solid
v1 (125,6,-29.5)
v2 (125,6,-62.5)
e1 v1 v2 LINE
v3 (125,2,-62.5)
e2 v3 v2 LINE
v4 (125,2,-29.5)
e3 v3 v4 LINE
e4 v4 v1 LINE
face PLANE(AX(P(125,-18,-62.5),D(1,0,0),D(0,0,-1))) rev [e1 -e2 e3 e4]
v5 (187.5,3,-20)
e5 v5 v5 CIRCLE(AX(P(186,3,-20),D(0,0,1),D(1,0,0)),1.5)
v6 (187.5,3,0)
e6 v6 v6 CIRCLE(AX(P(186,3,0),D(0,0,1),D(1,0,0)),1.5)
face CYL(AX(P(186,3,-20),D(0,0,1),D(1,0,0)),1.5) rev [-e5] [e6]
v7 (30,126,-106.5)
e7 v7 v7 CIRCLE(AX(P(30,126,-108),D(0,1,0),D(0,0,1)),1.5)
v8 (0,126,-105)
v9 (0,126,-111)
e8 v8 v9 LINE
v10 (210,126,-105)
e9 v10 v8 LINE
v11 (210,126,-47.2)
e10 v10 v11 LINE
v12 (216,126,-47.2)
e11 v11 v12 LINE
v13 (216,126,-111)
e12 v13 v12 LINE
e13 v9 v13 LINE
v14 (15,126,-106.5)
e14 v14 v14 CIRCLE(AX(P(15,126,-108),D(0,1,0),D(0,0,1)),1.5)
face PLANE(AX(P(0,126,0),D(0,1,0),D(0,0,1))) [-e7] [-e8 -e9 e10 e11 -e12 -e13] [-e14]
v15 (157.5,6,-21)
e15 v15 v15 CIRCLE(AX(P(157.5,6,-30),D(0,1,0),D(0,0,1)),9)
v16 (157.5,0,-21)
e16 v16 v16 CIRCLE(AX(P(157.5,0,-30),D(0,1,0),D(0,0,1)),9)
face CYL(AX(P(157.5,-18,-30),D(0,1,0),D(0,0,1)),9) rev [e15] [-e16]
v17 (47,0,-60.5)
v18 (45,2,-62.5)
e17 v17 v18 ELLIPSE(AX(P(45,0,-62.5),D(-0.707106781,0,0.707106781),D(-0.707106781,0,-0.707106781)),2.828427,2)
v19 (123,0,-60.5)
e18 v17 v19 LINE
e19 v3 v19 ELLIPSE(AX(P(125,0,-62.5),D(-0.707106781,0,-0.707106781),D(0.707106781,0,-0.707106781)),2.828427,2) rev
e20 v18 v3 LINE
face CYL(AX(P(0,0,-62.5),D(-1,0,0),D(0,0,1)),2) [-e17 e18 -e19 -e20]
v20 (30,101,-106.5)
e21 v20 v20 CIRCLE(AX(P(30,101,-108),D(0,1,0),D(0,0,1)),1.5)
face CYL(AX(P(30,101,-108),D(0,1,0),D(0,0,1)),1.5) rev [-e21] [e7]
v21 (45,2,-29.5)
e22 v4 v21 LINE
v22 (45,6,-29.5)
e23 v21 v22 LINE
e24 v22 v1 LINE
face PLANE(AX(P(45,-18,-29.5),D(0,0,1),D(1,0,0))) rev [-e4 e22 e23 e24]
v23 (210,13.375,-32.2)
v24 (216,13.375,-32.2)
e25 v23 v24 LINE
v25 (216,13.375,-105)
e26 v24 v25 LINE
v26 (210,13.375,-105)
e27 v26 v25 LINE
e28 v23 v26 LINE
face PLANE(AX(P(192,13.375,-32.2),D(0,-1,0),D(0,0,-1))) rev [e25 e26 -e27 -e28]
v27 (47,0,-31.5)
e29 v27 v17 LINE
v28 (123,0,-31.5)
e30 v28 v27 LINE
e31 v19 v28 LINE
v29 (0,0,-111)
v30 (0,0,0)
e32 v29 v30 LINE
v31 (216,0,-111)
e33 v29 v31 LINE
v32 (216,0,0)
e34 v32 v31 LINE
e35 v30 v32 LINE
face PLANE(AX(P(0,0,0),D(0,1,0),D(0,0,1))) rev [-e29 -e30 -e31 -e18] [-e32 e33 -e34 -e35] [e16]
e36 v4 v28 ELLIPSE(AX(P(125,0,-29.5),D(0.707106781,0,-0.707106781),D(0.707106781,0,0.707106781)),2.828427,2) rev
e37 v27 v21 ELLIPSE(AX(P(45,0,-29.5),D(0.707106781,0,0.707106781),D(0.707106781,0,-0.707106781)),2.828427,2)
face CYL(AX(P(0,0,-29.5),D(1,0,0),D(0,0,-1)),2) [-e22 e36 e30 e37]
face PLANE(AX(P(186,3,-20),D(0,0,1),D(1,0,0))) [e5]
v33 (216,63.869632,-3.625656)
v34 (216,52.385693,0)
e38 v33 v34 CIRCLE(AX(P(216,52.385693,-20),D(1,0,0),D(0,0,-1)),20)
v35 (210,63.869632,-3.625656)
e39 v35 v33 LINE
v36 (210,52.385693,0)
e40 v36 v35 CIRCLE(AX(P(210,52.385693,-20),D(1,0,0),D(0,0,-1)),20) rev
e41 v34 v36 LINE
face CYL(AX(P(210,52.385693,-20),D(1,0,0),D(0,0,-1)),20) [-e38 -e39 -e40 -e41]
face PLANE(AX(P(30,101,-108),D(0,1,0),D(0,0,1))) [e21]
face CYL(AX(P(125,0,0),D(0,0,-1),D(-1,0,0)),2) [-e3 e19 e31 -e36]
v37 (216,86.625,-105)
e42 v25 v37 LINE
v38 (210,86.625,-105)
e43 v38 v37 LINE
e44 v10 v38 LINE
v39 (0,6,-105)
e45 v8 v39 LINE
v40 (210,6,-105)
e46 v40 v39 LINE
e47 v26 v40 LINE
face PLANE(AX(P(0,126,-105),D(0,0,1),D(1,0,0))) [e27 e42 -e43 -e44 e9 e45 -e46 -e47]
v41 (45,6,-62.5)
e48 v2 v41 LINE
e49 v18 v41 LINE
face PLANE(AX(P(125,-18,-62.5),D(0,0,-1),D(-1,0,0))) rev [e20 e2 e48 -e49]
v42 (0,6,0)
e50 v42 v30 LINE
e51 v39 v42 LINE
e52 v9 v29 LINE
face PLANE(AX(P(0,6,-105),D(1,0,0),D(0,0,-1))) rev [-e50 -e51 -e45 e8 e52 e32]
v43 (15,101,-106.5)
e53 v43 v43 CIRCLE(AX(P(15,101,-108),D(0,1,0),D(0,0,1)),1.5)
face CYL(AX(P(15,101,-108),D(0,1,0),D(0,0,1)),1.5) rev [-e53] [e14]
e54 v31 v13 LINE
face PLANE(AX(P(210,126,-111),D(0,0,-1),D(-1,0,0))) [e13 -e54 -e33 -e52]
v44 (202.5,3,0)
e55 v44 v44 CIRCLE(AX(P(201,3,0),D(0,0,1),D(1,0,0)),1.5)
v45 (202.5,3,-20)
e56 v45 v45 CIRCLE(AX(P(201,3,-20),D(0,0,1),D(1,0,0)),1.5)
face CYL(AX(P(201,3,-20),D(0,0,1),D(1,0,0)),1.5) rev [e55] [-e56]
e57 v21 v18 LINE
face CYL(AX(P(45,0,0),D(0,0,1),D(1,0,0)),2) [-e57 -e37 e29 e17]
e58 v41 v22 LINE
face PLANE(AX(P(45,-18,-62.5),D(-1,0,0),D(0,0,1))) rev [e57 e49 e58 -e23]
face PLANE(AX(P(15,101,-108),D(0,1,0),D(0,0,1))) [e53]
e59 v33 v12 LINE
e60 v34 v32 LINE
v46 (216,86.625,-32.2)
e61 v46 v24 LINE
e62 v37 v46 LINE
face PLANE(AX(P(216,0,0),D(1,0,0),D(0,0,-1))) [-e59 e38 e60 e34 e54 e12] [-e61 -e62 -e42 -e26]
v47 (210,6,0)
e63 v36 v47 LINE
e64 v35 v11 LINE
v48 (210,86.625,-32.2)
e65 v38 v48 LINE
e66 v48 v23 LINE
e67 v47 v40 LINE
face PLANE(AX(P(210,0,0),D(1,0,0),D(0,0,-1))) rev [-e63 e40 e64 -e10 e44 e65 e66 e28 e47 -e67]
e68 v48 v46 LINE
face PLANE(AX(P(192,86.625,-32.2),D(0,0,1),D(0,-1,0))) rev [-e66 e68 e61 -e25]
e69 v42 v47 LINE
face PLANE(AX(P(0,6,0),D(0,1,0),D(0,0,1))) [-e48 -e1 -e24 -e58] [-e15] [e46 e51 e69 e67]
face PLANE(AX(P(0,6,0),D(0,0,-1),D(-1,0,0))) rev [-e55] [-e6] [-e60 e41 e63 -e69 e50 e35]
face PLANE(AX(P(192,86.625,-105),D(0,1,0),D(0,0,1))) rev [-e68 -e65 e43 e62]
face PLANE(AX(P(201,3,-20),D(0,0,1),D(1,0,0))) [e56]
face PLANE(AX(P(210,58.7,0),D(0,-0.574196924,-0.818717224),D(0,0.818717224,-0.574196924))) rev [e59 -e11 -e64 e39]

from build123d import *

# Parameters (mm, degrees)
SKETCH1_W           = 210
SKETCH1_H           = 105
BOSS_EXTRUDE1_DEPTH = 6
SKETCH2_W           = 210
SKETCH2_H           = 6
BOSS_EXTRUDE2_DEPTH = 126
SKETCH3_W           = 111
SKETCH3_H           = 126
BOSS_EXTRUDE3_DEPTH = 6
CUT_EXTRUDE2_DEPTH  = 6
SKETCH7_R           = 9
CUT_EXTRUDE3_DEPTH  = 24
SKETCH8_W           = 72.8
SKETCH8_H           = 73.25
CUT_EXTRUDE4_DEPTH  = 24
SKETCH9_W           = 80
SKETCH9_H           = 33
CUT_EXTRUDE5_DEPTH  = 24
FILLET1_R           = 20
SKETCH11_W          = 80
SKETCH11_H          = 33
SKETCH11_W_2        = 76
SKETCH11_H_2        = 29
BOSS_EXTRUDE4_DEPTH = 2
FILLET2_R           = 2
SKETCH12_R          = 1.5
CUT_EXTRUDE6_DEPTH  = 20
SKETCH13_R          = 1.5
CUT_EXTRUDE7_DEPTH  = 25


with BuildPart() as part:
    # Sketch1 → Boss-Extrude1 (new body)
    with BuildSketch(Plane(origin=(0, 0, 0), x_dir=(1, 0, 0), z_dir=(0, 1, 0))):
        with Locations((105, 52.5)):
            Rectangle(SKETCH1_W, SKETCH1_H)
    extrude(amount=BOSS_EXTRUDE1_DEPTH)

    # Sketch2 → Boss-Extrude2 (add)
    with BuildSketch(Plane.XZ):
        with Locations((105, -108)):
            Rectangle(SKETCH2_W, SKETCH2_H)
    extrude(amount=-BOSS_EXTRUDE2_DEPTH)

    # Sketch3 → Boss-Extrude3 (add)
    with BuildSketch(Plane(origin=(210, 0, 0), x_dir=(0, 0, -1), z_dir=(1, 0, 0))):
        with Locations((55.5, 63)):
            Rectangle(SKETCH3_W, SKETCH3_H)
    extrude(amount=BOSS_EXTRUDE3_DEPTH)

    # Sketch6 → Cut-Extrude2 (cut)
    with BuildSketch(Plane(origin=(216, 0, 0), x_dir=(0, 0, -1), z_dir=(1, 0, 0))):
        Polygon((0, 58.7), (47.2, 126), (0, 126), align=None)
    extrude(amount=-CUT_EXTRUDE2_DEPTH, mode=Mode.SUBTRACT)

    # Sketch7 → Cut-Extrude3 (cut)
    with BuildSketch(Plane(origin=(0, 6, 0), x_dir=(1, 0, 0), z_dir=(0, 1, 0))):
        with Locations(Location((157.5, 30, 0), (0, 0, 270))):
            Circle(SKETCH7_R)
    extrude(amount=-CUT_EXTRUDE3_DEPTH, mode=Mode.SUBTRACT)

    # Sketch8 → Cut-Extrude4 (cut)
    with BuildSketch(Plane(origin=(216, 0, 0), x_dir=(0, 0, -1), z_dir=(1, 0, 0))):
        with Locations((68.6, 50)):
            Rectangle(SKETCH8_W, SKETCH8_H)
    extrude(amount=-CUT_EXTRUDE4_DEPTH, mode=Mode.SUBTRACT)

    # Sketch9 → Cut-Extrude5 (cut)
    with BuildSketch(Plane(origin=(0, 6, 0), x_dir=(1, 0, 0), z_dir=(0, 1, 0))):
        with Locations((85, 46)):
            Rectangle(SKETCH9_W, SKETCH9_H)
    extrude(amount=-CUT_EXTRUDE5_DEPTH, mode=Mode.SUBTRACT)

    # Fillet1
    fillet1_edges = [part.edges().sort_by_distance(p)[0] for p in [
        (213, 58.7, 0),
    ]]
    fillet(fillet1_edges, radius=FILLET1_R)

    # Sketch11 → Boss-Extrude4 (add)
    with BuildSketch(Plane.XZ):
        with Locations((85, -46)):
            Rectangle(SKETCH11_W, SKETCH11_H)
        with Locations((85, -46)):
            Rectangle(SKETCH11_W_2, SKETCH11_H_2, mode=Mode.SUBTRACT)
    extrude(amount=-BOSS_EXTRUDE4_DEPTH)

    # Fillet2
    fillet2_edges = [part.edges().sort_by_distance(p)[0] for p in [
        (85, 2, -31.5),
        (123, 2, -46),
        (85, 2, -60.5),
        (47, 2, -46),
    ]]
    fillet(fillet2_edges, radius=FILLET2_R - 0.0001)  # a hair under: the kernel refuses the full size

    # Sketch12 → Cut-Extrude6 (cut)
    with BuildSketch(Plane.XY):
        with Locations((201, 3)):
            Circle(SKETCH12_R)
        with Locations((186, 3)):
            Circle(SKETCH12_R)
    extrude(amount=-CUT_EXTRUDE6_DEPTH, mode=Mode.SUBTRACT)

    # Sketch13 → Cut-Extrude7 (cut)
    with BuildSketch(Plane(origin=(0, 126, 0), x_dir=(1, 0, 0), z_dir=(0, 1, 0))):
        with Locations(Location((15, 108, 0), (0, 0, 270))):
            Circle(SKETCH13_R)
        with Locations(Location((30, 108, 0), (0, 0, 270))):
            Circle(SKETCH13_R)
    extrude(amount=-CUT_EXTRUDE7_DEPTH, mode=Mode.SUBTRACT)


solid = part.part
